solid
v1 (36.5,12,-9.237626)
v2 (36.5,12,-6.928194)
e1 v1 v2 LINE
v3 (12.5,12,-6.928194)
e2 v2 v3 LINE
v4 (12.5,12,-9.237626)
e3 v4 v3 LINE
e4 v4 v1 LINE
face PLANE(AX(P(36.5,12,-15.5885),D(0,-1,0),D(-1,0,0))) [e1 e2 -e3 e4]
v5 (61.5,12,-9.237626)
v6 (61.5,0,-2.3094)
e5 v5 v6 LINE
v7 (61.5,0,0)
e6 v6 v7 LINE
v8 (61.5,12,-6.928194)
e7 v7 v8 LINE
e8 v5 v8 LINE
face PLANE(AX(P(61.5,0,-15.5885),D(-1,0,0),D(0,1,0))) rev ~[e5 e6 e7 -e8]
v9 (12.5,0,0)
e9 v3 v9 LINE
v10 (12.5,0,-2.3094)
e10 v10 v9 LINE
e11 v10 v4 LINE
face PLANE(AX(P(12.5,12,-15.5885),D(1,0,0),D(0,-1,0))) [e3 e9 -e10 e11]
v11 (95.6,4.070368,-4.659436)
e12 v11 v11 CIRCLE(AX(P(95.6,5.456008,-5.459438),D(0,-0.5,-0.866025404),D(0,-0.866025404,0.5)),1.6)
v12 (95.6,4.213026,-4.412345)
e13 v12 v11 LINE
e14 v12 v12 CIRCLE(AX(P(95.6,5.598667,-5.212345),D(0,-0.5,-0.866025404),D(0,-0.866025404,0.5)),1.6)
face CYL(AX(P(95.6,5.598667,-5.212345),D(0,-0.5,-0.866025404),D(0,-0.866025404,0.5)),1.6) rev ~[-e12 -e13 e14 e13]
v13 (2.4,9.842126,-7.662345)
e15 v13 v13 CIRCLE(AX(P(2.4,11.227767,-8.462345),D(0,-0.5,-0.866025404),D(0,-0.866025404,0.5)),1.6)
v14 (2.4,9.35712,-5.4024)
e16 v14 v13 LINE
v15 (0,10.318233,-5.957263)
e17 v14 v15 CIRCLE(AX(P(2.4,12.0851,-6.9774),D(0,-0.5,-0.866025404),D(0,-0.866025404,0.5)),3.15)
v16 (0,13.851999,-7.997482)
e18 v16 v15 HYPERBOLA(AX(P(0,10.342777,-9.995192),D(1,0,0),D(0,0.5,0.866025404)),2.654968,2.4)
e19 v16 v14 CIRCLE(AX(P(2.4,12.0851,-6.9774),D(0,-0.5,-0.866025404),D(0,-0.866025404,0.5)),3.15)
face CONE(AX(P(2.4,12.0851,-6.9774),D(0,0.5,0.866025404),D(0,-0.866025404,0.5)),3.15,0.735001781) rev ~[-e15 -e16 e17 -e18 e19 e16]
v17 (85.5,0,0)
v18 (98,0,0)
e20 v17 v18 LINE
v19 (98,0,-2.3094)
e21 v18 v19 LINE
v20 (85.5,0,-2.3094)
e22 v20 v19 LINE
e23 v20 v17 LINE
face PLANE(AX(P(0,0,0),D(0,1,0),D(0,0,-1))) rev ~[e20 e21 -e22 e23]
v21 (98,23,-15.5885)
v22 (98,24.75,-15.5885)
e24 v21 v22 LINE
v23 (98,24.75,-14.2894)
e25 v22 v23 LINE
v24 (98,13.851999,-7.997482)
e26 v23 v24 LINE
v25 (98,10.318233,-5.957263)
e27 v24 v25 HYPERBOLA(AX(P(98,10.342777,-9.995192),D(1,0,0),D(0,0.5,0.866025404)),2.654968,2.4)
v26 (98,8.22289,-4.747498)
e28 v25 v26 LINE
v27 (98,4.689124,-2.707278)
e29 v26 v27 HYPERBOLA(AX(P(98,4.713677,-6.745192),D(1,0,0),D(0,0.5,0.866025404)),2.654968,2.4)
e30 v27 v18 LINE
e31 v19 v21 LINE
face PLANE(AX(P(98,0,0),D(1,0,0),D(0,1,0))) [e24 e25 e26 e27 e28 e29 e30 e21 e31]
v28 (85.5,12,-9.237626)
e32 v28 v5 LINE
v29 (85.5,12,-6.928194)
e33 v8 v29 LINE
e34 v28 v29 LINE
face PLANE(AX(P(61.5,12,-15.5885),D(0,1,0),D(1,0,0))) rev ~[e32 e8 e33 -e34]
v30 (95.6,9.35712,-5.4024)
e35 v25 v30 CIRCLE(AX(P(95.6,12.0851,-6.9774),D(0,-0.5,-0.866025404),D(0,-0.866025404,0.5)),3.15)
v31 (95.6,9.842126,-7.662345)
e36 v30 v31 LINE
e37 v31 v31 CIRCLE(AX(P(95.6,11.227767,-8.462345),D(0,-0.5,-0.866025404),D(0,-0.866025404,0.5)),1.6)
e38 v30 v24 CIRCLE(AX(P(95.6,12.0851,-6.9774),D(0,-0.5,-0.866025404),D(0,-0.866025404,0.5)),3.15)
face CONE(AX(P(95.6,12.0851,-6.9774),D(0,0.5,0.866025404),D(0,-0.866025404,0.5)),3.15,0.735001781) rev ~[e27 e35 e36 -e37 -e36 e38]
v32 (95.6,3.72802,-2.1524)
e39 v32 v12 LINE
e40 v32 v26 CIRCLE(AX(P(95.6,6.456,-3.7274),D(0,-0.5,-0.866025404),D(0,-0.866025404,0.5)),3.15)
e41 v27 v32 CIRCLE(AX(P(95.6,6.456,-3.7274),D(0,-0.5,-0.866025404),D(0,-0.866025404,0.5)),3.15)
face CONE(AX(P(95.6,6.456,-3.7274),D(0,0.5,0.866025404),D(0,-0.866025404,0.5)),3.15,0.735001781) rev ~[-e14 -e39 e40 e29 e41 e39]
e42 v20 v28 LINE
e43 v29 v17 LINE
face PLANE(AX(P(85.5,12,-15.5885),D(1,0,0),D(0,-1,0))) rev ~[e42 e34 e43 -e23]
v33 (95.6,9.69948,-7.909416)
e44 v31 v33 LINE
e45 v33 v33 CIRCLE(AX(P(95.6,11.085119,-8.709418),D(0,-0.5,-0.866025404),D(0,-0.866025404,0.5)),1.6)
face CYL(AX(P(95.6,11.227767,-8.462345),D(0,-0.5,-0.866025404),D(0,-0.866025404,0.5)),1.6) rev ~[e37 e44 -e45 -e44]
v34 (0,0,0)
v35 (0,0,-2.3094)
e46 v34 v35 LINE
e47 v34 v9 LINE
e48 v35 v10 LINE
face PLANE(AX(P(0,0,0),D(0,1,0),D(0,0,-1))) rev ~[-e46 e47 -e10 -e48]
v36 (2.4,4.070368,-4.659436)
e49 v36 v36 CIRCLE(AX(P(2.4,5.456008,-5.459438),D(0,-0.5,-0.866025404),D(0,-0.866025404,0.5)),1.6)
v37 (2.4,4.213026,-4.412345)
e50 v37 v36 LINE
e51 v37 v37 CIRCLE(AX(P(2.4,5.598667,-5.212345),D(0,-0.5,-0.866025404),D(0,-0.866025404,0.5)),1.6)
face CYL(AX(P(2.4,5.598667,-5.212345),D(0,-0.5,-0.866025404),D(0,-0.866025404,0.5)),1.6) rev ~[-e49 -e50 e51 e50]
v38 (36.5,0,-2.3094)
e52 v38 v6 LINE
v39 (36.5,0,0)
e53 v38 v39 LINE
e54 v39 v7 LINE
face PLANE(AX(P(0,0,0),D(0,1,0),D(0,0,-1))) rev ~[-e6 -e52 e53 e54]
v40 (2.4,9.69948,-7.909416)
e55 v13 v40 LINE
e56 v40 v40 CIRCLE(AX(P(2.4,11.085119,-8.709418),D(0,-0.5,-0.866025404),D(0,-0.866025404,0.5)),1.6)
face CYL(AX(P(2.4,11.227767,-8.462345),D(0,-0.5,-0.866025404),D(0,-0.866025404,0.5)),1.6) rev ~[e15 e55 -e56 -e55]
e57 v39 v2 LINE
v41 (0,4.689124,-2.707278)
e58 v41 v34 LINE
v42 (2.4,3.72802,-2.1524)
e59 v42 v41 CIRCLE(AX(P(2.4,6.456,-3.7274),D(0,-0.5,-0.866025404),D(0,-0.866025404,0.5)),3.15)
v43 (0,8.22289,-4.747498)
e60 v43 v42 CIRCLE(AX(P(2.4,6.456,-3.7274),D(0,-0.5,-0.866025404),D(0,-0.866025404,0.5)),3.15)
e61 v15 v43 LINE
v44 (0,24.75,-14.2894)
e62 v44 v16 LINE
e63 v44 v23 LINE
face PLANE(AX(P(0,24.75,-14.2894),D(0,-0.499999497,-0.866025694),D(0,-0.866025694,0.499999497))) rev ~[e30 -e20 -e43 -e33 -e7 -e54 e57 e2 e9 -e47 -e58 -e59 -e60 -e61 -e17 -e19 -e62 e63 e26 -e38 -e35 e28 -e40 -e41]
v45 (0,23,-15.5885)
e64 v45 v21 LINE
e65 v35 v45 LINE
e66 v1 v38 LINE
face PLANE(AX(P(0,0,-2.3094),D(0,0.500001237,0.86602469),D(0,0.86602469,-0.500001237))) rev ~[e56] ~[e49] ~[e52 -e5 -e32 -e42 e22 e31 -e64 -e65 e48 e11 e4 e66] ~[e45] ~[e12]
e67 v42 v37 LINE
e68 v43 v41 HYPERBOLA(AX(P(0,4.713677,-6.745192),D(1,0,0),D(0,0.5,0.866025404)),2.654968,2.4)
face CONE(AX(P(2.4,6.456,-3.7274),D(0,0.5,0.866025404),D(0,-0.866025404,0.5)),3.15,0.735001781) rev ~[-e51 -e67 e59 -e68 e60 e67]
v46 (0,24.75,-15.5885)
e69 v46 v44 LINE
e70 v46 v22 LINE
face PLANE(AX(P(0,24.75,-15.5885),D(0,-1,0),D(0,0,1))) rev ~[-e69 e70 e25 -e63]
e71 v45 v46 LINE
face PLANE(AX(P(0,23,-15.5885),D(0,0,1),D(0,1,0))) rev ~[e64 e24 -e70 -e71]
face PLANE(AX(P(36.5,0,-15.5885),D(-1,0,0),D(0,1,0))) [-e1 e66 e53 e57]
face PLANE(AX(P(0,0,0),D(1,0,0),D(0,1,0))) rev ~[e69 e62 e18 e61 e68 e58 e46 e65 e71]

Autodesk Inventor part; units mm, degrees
ref_plane "YZ Plane" through (0, 0, 0) normal (1, 0, 0) x (0, 1, 0)
ref_plane "XZ Plane" through (0, 0, 0) normal (0, 1, 0) x (-1, 0, 0)
ref_plane "XY Plane" through (0, 0, 0) normal (0, 0, 1) x (1, 0, 0)
sketch "Szkic1" plane through (0, 0, 0) normal (1, 0, 0) x (0, 1, 0)
  line L0 (0, 0) -> (0, -2.3094)
  line L1 (0, -2.3094) -> (23, -15.5885)
  line L2 (24.75, -14.2894) -> (0, 0)
  line L3 (23, -15.5885) -> (24.75, -15.5885)
  line L4 (24.75, -15.5885) -> (24.75, -14.2894)
  dimension "d0" = 60
  dimension "d1" = 2
  dimension "d2" = 1.75
  dimension "d3" = 23
extrude "Wyciągnięcie proste1" add sketch "Szkic1" along normal blind 98
sketch "Szkic2" plane through (98, 24.75, -15.5885) normal (0, 0, -1) x (-1, 0, 0)
  line L0 (98, -24.75) -> (0, -24.75) construction
  line L1 (12.5, -24.75) -> (36.5, -24.75)
  line L2 (36.5, -24.75) -> (36.5, -12.75)
  line L3 (36.5, -12.75) -> (12.5, -12.75)
  line L4 (12.5, -12.75) -> (12.5, -24.75)
  line L5 (49, -24.75) -> (49, 0) construction
  line L6 (98, 0) -> (0, 0) construction
  line L7 (85.5, -24.75) -> (61.5, -24.75)
  line L8 (61.5, -24.75) -> (61.5, -12.75)
  line L9 (61.5, -12.75) -> (85.5, -12.75)
  line L10 (85.5, -12.75) -> (85.5, -24.75)
  line L11 (0, -24.75) -> (0, -1.75) construction
  dimension "d6" = 12
  dimension "d7" = 24
  dimension "d8" = 12.5
extrude "Wyciągnięcie proste2" cut sketch "Szkic2" against normal through all
sketch "Szkic3" plane through (0, 24.75, -14.2894) normal (0, 0.5, 0.8660254) x (1, 0, 0)
  line L0 (0, -28.5788) -> (12.5, -28.5788) construction
  line L1 (2.4, -28.5788) -> (2.4, -14.6241) construction
  line L2 (0, 0) -> (0, -28.5788) construction
  line L3 (0, -27.4241) -> (12.5, -27.4241) construction
  line L4 (36.5, -28.5788) -> (61.5, -28.5788) construction
  line L5 (49, -28.5788) -> (49, 0.6495) construction
  line L6 (0, 0.6495) -> (98, 0.6495) construction
  point P0 (2.4, -21.1241)
  point P1 (95.6, -14.6241)
  point P2 (95.6, -21.1241)
  dimension "d11" = 2.4
  dimension "d12" = 6.3
  dimension "d13" = 12.8
hole "Otwór1" at (2.4, 12.0851, -6.9774) at (2.4, 6.456, -3.7274) at (95.6, 12.0851, -6.9774) at (95.6, 6.456, -3.7274) direction (0, -0.5, -0.8660254) diameter 3.2 depth 5 tip angle 118 countersink diameter 6.3 countersink angle 84.225 clearance for "Śruba ze łbem stożkowym ISO 2009/7046" size "M3" standard "ISO"
properties part number "Przod" material "Aluminium 6061"
